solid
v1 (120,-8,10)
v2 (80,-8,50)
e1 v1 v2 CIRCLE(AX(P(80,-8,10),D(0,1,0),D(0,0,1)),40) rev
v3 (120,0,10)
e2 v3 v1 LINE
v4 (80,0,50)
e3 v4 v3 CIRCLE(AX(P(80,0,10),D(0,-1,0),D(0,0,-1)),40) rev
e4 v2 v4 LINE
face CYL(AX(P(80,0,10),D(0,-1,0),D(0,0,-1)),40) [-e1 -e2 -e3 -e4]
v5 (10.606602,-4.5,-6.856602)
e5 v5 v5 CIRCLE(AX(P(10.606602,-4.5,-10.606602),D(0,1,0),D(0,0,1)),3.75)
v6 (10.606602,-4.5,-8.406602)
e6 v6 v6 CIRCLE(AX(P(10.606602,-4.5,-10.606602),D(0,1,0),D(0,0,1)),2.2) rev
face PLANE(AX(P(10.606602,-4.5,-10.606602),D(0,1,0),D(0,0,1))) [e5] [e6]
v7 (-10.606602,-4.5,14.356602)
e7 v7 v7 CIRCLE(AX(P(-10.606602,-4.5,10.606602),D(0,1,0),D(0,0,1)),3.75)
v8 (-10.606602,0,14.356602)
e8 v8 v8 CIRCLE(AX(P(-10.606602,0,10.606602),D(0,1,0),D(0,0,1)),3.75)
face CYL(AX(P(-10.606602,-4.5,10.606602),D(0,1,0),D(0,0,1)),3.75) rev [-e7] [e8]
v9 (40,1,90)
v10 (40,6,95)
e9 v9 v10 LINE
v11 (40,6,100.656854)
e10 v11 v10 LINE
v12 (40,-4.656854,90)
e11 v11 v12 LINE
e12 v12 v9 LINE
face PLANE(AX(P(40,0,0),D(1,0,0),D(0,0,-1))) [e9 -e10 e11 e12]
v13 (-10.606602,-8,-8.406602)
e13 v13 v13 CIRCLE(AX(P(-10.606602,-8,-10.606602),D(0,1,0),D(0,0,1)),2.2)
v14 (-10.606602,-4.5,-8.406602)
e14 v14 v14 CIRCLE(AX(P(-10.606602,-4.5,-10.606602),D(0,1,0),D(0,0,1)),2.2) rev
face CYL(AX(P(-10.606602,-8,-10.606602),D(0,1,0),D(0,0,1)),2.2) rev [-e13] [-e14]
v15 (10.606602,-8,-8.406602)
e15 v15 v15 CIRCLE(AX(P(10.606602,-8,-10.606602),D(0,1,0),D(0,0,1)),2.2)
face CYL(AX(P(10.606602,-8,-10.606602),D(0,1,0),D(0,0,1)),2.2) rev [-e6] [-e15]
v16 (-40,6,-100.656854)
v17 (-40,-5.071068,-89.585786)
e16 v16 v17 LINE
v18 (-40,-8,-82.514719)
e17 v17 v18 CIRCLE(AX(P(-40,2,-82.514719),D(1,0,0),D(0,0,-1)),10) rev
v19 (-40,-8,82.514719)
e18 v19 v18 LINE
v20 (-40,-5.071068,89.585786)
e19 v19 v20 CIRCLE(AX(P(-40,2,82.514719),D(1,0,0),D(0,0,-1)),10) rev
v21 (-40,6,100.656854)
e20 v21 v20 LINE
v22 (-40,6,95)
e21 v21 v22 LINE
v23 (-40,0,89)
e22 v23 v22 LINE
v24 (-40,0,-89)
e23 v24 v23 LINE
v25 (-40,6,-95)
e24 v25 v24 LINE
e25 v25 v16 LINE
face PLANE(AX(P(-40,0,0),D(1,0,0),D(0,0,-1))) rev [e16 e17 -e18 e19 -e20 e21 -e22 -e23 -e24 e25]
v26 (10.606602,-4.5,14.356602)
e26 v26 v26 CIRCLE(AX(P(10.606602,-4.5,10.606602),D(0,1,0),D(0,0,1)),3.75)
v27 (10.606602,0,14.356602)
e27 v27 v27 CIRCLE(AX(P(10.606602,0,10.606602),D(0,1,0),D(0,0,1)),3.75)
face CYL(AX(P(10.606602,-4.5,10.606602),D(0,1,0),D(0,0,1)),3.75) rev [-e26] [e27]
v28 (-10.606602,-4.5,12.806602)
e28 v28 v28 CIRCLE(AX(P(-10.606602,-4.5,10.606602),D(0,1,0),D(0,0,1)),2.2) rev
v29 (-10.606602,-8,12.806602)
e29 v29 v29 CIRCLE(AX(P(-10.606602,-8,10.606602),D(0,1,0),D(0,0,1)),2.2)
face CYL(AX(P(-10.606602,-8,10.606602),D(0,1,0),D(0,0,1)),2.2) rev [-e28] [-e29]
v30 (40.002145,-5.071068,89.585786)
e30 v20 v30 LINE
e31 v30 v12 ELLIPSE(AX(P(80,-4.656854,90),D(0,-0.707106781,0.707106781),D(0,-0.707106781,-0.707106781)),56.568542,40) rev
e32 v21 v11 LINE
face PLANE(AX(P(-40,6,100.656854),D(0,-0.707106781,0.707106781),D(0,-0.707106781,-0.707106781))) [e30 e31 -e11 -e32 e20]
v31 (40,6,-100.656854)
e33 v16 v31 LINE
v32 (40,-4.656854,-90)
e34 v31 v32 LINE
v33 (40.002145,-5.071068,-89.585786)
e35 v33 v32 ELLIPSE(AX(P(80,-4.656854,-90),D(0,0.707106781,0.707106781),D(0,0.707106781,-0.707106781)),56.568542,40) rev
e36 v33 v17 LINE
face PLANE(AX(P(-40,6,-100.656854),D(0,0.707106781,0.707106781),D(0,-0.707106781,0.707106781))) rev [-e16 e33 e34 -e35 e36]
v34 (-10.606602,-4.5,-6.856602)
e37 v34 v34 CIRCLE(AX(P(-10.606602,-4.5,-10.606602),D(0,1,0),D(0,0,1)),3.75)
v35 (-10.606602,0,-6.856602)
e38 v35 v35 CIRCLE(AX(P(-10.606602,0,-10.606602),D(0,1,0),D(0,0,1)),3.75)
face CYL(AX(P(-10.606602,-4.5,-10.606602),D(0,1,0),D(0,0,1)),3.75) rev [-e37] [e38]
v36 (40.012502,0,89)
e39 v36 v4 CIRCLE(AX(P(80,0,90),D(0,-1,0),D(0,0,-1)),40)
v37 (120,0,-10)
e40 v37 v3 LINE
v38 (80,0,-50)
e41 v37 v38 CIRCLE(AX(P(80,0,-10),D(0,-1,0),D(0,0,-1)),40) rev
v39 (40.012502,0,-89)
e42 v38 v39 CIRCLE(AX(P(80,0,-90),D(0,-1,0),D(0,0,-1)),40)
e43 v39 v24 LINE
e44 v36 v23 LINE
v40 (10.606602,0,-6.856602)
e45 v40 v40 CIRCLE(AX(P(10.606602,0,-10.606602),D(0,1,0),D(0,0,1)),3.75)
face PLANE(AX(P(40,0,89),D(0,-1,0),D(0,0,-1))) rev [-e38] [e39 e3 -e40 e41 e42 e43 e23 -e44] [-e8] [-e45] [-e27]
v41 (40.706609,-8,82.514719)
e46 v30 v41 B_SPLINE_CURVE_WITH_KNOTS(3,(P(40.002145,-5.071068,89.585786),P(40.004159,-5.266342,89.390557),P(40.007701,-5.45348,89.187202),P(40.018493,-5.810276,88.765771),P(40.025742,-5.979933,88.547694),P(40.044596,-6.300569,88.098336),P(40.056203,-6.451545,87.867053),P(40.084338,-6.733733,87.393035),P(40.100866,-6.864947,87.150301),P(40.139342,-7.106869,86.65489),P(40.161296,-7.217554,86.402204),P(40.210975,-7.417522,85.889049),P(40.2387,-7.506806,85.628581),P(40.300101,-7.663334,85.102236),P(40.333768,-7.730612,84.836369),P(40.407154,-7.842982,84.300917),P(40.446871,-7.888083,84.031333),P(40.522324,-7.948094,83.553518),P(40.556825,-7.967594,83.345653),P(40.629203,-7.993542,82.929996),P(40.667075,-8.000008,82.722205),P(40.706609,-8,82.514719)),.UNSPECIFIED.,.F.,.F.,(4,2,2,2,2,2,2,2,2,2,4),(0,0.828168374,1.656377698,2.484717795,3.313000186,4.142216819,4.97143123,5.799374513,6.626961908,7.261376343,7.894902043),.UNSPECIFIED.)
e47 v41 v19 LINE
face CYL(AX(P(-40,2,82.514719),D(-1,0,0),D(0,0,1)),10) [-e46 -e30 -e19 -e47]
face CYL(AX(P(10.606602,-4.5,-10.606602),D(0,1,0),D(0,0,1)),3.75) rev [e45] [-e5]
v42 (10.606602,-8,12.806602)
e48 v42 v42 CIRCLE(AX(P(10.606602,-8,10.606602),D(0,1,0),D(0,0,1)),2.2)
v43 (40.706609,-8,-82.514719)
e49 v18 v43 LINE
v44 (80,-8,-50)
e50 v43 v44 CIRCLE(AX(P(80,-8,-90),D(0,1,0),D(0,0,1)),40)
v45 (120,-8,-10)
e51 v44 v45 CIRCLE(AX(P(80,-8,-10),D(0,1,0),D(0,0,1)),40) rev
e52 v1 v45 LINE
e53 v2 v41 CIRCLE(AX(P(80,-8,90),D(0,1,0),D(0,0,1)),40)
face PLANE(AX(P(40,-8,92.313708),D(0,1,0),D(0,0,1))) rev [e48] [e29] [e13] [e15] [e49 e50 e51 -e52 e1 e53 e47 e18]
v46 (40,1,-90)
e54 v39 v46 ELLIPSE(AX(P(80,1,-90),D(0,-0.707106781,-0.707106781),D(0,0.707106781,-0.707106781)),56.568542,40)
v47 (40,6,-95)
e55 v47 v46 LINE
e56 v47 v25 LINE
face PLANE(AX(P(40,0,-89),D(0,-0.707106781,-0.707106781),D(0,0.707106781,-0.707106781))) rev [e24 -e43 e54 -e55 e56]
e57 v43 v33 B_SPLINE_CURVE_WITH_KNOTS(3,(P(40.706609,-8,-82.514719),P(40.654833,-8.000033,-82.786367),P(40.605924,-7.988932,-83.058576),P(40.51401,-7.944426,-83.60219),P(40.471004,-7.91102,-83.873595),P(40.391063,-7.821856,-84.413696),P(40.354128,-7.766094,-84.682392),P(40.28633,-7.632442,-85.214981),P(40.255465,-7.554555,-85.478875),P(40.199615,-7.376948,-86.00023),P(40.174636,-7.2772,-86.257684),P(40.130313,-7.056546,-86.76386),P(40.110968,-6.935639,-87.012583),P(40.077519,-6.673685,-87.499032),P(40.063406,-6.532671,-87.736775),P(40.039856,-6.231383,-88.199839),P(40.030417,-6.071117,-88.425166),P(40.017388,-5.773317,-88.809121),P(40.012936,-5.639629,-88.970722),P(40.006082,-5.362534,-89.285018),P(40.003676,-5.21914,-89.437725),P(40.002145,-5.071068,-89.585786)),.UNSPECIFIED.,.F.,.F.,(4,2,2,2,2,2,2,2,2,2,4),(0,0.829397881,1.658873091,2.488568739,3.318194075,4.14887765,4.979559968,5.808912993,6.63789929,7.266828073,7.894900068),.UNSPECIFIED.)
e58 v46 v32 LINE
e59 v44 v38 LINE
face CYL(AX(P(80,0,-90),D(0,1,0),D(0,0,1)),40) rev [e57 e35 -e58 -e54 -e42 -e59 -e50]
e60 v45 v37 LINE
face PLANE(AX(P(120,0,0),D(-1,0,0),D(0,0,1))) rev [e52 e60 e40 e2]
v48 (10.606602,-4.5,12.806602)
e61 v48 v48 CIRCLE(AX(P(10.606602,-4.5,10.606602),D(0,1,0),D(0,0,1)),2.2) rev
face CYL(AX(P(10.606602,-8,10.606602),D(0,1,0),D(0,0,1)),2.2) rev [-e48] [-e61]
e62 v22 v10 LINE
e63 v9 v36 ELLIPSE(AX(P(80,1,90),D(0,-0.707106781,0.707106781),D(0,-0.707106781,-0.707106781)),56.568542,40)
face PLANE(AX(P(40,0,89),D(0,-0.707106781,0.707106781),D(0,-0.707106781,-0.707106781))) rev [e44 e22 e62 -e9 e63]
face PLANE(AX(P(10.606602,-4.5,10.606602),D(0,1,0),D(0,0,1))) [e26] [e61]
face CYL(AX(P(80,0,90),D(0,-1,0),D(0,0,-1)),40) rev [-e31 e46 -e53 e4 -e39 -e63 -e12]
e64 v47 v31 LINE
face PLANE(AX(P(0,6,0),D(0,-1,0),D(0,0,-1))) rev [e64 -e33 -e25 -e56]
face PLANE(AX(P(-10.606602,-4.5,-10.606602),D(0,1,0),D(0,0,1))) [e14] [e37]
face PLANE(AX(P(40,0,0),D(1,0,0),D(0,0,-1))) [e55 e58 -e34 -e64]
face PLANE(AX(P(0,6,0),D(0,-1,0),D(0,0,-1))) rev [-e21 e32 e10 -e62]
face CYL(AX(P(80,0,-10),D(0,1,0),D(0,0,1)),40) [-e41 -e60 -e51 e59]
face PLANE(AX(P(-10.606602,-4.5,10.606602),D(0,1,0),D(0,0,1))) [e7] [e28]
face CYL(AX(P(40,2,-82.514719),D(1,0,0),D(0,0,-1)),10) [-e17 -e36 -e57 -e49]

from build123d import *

# Parameters (mm, degrees)
MAIN_DEPTH          = 40
SKETCH11_W          = 100
SKETCH11_H          = 8
BOSS_EXTRUDE1_DEPTH = 80
FILLET1_R           = 40
SKETCH12_R          = 2.2
CUT_EXTRUDE1_DEPTH  = 162.365552125
SKETCH13_R          = 3.75
CUT_EXTRUDE2_DEPTH  = 4.5
CUT_EXTRUDE3_START  = 13
SKETCH14_W          = 80
SKETCH14_H          = 214.313708498
CUT_EXTRUDE3_DEPTH  = 7
CUT_EXTRUDE4_START  = 1
CUT_EXTRUDE4_DEPTH  = 135.291427387
FILLET2_R           = 10


with BuildPart() as part:
    # Sketch2 → Main (new, symmetric)
    with BuildSketch(Plane(origin=(0, 0, 0), x_dir=(0, 0, -1), z_dir=(1, 0, 0))):
        Polygon((-89, 0), (89, 0), (101.5, 12.5), (107.156854249, 6.843145751), (92.313708499, -8), (-92.313708499, -8), (-107.156854249, 6.843145751), (-101.5, 12.5), align=None)
    extrude(amount=MAIN_DEPTH, both=True)

    # Sketch11 → Boss-Extrude1 (add)
    with BuildSketch(Plane(origin=(40, 0, 0), x_dir=(0, 0, -1), z_dir=(1, 0, 0))):
        with Locations((0, -4)):
            Rectangle(SKETCH11_W, SKETCH11_H)
    extrude(amount=BOSS_EXTRUDE1_DEPTH)

    # Fillet1
    fillet1_edges = [part.edges().sort_by_distance(p)[0] for p in [
        (120, -4, -50),
        (40, -4, -50),
        (40, -4, 50),
        (120, -4, 50),
    ]]
    fillet(fillet1_edges, radius=FILLET1_R - 0.0001)  # a hair under: the kernel refuses the full size

    # Sketch12 → Cut-Extrude1 (cut, through all)
    with BuildSketch(Plane(origin=(0, 0, 0), x_dir=(1, 0, 0), z_dir=(0, 1, 0))):
        with Locations(Location((-10.606601718, 10.606601718, 0), (0, 0, 270))):
            Circle(SKETCH12_R)
        with Locations(Location((10.606601718, 10.606601718, 0), (0, 0, 270))):
            Circle(SKETCH12_R)
        with Locations(Location((10.606601718, -10.606601718, 0), (0, 0, 270))):
            Circle(SKETCH12_R)
        with Locations(Location((-10.606601718, -10.606601718, 0), (0, 0, 270))):
            Circle(SKETCH12_R)
    extrude(amount=-CUT_EXTRUDE1_DEPTH, mode=Mode.SUBTRACT)

    # Sketch13 → Cut-Extrude2 (cut)
    with BuildSketch(Plane(origin=(0, 0, 0), x_dir=(1, 0, 0), z_dir=(0, 1, 0))):
        with Locations(Location((-10.606601718, 10.606601718, 0), (0, 0, 270))):
            Circle(SKETCH13_R)
        with Locations(Location((10.606601718, 10.606601718, 0), (0, 0, 270))):
            Circle(SKETCH13_R)
        with Locations(Location((10.606601718, -10.606601718, 0), (0, 0, 270))):
            Circle(SKETCH13_R)
        with Locations(Location((-10.606601718, -10.606601718, 0), (0, 0, 270))):
            Circle(SKETCH13_R)
    extrude(amount=-CUT_EXTRUDE2_DEPTH, mode=Mode.SUBTRACT)

    # Sketch14 → Cut-Extrude3 (cut)
    with BuildSketch(Plane(origin=(0, 0, 0), x_dir=(1, 0, 0), z_dir=(0, 1, 0)).offset(CUT_EXTRUDE3_START)):
        Rectangle(SKETCH14_W, SKETCH14_H)
    extrude(amount=-CUT_EXTRUDE3_DEPTH, mode=Mode.SUBTRACT)

    # Sketch15 → Cut-Extrude4 (cut, through all)
    with BuildSketch(Plane(origin=(40, 0, 0), x_dir=(0, 0, -1), z_dir=(1, 0, 0)).offset(CUT_EXTRUDE4_START)):
        Polygon((106.313708499, 6), (92.313708499, -8), (86.656854249, -8), (100.656854249, 6), align=None)
    cut_extrude4 = extrude(amount=-CUT_EXTRUDE4_DEPTH, mode=Mode.SUBTRACT)

    # Mirror1: Cut-Extrude4 across plane
    add(cut_extrude4.mirror(Plane.XY), mode=Mode.SUBTRACT)

    # Fillet2
    fillet2_edges = [part.edges().sort_by_distance(p)[0] for p in [
        (0.069972296, -8, 86.656854249),
        (0.069972296, -8, -86.656854249),
    ]]
    fillet(fillet2_edges, radius=FILLET2_R)


solid = part.part
